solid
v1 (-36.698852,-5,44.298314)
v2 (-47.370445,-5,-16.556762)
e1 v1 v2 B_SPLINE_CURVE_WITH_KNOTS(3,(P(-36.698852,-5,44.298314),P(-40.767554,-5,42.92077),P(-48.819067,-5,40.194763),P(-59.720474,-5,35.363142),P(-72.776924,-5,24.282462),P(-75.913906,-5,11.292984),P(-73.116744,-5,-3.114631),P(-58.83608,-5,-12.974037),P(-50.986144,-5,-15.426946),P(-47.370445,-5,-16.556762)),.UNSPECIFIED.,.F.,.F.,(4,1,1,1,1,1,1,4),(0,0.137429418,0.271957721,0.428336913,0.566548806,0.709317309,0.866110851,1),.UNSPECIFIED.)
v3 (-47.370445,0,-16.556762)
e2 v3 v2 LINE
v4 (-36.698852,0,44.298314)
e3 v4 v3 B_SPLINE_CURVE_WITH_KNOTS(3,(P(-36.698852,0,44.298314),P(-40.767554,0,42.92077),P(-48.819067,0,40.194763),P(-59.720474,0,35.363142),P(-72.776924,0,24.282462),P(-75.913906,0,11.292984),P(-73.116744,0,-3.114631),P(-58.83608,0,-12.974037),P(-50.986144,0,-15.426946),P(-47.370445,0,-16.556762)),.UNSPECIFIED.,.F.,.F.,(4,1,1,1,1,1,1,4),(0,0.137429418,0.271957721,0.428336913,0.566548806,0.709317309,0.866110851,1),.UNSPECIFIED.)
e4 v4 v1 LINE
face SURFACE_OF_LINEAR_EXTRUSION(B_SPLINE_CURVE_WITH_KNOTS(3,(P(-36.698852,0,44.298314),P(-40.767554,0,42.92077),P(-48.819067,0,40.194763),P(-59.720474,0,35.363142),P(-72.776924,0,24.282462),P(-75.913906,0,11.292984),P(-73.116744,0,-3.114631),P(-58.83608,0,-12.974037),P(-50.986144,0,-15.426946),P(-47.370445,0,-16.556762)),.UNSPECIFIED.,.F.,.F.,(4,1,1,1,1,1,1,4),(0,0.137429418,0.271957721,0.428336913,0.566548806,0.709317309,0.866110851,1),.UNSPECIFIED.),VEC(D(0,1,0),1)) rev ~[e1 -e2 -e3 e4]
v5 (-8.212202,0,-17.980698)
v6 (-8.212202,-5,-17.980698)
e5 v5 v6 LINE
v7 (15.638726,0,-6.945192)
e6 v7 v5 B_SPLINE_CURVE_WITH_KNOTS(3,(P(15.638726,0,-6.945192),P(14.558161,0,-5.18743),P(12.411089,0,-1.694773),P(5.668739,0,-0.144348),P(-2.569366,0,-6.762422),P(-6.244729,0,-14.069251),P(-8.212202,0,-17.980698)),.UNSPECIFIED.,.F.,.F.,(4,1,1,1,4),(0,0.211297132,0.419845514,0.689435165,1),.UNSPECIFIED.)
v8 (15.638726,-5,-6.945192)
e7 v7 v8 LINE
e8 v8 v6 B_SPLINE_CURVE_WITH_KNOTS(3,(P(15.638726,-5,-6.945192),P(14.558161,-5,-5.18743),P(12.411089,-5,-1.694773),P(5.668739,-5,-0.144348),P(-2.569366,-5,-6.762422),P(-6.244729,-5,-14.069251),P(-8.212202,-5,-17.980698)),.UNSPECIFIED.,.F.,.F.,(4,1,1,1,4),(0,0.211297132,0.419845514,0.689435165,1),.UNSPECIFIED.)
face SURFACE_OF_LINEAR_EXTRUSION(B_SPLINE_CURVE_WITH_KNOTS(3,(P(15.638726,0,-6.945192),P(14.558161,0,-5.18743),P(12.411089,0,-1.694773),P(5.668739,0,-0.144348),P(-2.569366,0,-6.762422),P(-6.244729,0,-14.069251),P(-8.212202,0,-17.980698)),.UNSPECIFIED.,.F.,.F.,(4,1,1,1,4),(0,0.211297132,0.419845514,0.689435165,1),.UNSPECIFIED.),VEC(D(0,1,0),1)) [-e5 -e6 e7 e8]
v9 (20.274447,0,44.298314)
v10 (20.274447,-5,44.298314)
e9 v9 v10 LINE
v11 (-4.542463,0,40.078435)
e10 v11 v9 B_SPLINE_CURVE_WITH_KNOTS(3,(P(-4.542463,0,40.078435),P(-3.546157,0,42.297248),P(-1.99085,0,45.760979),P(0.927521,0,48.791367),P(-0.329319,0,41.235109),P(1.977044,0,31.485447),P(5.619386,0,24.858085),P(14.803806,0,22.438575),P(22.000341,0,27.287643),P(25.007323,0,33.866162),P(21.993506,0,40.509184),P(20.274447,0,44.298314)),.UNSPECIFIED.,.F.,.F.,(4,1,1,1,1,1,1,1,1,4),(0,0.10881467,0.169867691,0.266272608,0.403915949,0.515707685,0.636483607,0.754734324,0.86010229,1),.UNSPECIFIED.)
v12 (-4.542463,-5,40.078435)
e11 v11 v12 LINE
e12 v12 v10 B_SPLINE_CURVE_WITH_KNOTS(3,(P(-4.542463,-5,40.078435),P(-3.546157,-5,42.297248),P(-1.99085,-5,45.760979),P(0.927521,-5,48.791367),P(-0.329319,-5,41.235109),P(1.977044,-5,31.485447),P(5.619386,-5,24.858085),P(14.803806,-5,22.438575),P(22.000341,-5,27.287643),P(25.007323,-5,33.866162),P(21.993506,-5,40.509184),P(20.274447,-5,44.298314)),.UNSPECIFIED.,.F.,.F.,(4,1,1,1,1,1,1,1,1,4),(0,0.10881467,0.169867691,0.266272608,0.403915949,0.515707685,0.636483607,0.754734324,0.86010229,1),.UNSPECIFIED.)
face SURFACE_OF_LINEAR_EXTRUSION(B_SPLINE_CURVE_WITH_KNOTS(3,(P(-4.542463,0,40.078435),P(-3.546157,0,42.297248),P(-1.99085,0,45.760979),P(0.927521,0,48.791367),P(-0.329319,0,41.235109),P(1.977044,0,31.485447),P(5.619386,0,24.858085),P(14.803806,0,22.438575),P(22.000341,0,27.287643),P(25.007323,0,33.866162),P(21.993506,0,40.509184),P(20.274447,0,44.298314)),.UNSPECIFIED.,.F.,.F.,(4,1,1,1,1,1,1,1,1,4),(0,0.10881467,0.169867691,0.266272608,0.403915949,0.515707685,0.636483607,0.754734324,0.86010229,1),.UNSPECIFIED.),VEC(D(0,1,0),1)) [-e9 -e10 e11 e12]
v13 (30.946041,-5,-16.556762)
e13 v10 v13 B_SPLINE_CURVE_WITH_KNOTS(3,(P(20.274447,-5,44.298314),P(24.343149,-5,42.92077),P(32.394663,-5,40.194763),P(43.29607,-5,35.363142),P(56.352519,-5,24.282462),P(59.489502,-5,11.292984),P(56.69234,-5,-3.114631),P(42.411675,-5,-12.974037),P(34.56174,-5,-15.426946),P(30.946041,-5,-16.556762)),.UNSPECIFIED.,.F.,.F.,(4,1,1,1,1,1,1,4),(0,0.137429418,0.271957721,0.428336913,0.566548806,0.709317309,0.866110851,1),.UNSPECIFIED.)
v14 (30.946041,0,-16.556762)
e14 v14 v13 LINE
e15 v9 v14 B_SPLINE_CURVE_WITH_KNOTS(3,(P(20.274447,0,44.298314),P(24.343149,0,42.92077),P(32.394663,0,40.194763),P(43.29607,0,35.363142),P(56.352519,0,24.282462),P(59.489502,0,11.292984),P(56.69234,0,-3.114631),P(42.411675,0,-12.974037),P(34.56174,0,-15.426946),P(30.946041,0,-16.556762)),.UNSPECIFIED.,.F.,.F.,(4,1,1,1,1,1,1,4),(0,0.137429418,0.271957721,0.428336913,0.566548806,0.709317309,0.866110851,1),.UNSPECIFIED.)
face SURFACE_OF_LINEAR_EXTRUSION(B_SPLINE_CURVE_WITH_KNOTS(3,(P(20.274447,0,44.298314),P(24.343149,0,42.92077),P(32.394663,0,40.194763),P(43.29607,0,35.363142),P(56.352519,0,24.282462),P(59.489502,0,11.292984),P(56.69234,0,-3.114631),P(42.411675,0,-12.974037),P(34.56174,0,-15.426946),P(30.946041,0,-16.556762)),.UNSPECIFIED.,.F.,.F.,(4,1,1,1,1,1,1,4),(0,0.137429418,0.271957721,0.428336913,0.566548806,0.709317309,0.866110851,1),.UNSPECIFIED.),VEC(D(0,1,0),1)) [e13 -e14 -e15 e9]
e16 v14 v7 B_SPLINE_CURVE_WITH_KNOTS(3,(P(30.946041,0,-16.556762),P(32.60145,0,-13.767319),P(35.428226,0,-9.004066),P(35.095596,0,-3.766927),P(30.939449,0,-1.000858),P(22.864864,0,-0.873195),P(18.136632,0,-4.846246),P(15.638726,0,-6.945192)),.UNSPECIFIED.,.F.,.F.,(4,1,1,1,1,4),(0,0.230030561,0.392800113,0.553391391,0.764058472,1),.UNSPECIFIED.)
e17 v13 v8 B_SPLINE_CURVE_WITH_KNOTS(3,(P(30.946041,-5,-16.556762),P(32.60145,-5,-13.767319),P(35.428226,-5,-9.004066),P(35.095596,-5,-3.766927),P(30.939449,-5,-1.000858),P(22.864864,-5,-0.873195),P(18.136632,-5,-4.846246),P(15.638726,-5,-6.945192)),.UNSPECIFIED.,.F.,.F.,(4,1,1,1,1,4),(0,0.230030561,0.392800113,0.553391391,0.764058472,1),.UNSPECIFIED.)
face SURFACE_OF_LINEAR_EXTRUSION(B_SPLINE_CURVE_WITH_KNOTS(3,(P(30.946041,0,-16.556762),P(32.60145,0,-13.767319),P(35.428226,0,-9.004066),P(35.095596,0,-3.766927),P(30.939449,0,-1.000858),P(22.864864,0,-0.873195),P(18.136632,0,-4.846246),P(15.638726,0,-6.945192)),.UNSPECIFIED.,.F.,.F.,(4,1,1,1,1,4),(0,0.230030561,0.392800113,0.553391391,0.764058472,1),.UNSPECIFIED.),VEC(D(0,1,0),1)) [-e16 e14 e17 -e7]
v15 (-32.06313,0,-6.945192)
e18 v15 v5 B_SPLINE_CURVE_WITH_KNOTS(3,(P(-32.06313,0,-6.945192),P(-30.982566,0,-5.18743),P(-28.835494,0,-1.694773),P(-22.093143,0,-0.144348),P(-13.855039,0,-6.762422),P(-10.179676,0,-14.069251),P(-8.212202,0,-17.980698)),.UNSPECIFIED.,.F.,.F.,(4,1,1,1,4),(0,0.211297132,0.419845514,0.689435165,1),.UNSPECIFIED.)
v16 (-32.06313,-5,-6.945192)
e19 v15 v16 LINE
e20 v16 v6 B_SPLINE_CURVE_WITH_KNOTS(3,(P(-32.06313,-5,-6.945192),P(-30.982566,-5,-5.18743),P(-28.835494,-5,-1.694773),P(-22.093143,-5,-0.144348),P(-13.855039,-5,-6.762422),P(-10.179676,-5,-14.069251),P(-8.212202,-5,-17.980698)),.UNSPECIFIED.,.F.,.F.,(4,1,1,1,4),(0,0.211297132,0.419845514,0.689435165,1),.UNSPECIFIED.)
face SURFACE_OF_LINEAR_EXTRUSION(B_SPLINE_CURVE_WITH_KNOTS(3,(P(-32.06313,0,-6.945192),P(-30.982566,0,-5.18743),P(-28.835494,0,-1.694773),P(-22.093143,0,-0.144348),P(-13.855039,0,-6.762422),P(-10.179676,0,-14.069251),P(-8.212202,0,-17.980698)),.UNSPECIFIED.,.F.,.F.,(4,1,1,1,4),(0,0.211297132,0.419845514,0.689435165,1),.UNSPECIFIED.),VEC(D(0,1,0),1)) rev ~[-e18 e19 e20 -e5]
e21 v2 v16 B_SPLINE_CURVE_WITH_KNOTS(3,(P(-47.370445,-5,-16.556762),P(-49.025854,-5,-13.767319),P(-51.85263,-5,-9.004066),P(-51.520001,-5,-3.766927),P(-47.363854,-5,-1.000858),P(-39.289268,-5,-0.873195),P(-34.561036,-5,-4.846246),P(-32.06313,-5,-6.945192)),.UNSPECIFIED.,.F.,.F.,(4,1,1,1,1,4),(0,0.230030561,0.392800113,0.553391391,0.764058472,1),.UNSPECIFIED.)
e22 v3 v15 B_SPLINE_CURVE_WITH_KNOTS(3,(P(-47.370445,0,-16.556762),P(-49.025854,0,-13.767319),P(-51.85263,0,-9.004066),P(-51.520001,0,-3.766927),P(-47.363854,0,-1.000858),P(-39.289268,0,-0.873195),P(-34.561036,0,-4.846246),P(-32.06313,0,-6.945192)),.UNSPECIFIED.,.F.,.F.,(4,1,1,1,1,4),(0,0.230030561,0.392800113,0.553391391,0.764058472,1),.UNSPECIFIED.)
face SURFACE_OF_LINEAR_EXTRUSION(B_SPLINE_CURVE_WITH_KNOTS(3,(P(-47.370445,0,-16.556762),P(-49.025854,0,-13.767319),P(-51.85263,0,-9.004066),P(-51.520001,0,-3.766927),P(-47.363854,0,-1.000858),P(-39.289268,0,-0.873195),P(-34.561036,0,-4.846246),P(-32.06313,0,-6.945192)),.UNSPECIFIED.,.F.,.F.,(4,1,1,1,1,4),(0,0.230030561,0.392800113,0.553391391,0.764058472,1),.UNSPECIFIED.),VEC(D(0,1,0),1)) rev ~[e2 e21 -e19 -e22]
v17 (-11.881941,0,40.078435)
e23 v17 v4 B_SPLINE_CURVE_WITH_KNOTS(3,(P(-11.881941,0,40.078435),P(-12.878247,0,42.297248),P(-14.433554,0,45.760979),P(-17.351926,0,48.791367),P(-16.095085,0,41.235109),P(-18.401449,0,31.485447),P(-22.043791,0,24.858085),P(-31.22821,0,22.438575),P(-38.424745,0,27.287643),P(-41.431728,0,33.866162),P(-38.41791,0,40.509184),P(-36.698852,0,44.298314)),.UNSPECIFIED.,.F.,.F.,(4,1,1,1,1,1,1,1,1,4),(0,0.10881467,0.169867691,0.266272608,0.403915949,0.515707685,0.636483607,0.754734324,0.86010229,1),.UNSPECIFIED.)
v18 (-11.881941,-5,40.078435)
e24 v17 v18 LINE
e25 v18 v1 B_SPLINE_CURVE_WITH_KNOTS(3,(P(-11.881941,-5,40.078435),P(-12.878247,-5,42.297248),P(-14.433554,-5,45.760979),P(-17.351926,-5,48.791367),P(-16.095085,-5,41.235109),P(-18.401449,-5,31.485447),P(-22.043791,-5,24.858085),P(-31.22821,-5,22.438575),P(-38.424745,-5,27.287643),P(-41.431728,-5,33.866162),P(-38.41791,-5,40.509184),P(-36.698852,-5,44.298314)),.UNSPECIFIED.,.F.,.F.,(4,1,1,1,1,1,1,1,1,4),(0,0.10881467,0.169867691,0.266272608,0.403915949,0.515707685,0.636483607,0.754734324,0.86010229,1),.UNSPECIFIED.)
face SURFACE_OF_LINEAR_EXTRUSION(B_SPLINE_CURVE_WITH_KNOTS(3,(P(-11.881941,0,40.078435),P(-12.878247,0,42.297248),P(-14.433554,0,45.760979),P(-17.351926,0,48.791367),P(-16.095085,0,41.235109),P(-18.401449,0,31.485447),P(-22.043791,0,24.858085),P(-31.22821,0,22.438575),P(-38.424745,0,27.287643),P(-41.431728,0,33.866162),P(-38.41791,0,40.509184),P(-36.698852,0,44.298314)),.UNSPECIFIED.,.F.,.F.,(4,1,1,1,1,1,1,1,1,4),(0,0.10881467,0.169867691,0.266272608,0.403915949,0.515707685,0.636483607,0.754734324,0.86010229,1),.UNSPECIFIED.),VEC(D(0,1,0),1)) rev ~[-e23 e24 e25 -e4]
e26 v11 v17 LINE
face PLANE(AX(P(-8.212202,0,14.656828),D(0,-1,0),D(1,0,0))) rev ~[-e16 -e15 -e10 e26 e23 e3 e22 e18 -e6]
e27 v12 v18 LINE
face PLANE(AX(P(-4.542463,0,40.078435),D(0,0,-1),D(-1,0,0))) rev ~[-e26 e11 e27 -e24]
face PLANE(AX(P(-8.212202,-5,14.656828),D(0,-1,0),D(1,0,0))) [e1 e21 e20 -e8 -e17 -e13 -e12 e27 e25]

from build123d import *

# Parameters (mm, degrees)
F1_DEPTH = 5


with BuildPart() as f1:
    # F0 (on Front) → F1 (new body)
    with BuildSketch(Plane.XZ):
        with BuildLine():
            Line((-8.2122022286, 40.0784350932), (-11.8819409981, 40.0784350932))
            add(Edge.make_bspline(
                [(-11.8819409981, 40.0784350932), (-12.8782472371, 42.2972484802), (-14.4335544357, 45.7609791067), (-17.3519257227, 48.7913666131), (-16.0950854738, 41.2351091341), (-18.4014485043, 31.4854467346), (-22.0437905993, 24.85808478), (-31.2282103596, 22.4385748293), (-38.4247454255, 27.2876434832), (-41.4317275403, 33.8661623662), (-38.41791048, 40.5091837611), (-36.6988517344, 44.2983135581)],
                knots=[0, 0, 0, 0, 0.1088146702, 0.1698676905, 0.2662726076, 0.4039159487, 0.5157076846, 0.6364836069, 0.7547343235, 0.8601022896, 1, 1, 1, 1], degree=3))
            add(Edge.make_bspline(
                [(-36.6988517344, 44.2983135581), (-40.7675535004, 42.9207700785), (-48.8190673042, 40.1947628707), (-59.720474171, 35.363141512), (-72.7769239422, 24.2824619419), (-75.9139064544, 11.2929836241), (-73.1167440149, -3.1146307179), (-58.8360799137, -12.9740366543), (-50.9861442753, -15.4269461348), (-47.3704449832, -16.5567621589)],
                knots=[0, 0, 0, 0, 0.1374294184, 0.271957721, 0.4283369128, 0.5665488064, 0.709317309, 0.8661108513, 1, 1, 1, 1], degree=3))
            add(Edge.make_bspline(
                [(-47.3704449832, -16.5567621589), (-49.0258540698, -13.767318885), (-51.8526301052, -9.0040664284), (-51.5200005236, -3.7669274307), (-47.3638537079, -1.00085823), (-39.2892684136, -0.8731954731), (-34.5610362718, -4.8462458488), (-32.0631302893, -6.9451923482)],
                knots=[0, 0, 0, 0, 0.2300305605, 0.3928001127, 0.553391391, 0.764058472, 1, 1, 1, 1], degree=3))
            add(Edge.make_bspline(
                [(-32.0631302893, -6.9451923482), (-30.9825657831, -5.1874304781), (-28.8354937584, -1.6947733382), (-22.0931432409, -0.1443481526), (-13.8550388164, -6.7624223585), (-10.1796756768, -14.0692507531), (-8.2122022286, -17.9806984961)],
                knots=[0, 0, 0, 0, 0.2112971318, 0.419845514, 0.689435165, 1, 1, 1, 1], degree=3))
            add(Edge.make_bspline(
                [(15.6387258321, -6.9451923482), (14.5581613259, -5.1874304781), (12.4110893012, -1.6947733382), (5.6687387837, -0.1443481526), (-2.5693656408, -6.7624223585), (-6.2447287804, -14.0692507531), (-8.2122022286, -17.9806984961)],
                knots=[0, 0, 0, 0, 0.2112971318, 0.419845514, 0.689435165, 1, 1, 1, 1], degree=3))
            add(Edge.make_bspline(
                [(30.946040526, -16.5567621589), (32.6014496126, -13.767318885), (35.428225648, -9.0040664284), (35.0955960664, -3.7669274307), (30.9394492507, -1.00085823), (22.8648639564, -0.8731954731), (18.1366318146, -4.8462458488), (15.6387258321, -6.9451923482)],
                knots=[0, 0, 0, 0, 0.2300305605, 0.3928001127, 0.553391391, 0.764058472, 1, 1, 1, 1], degree=3))
            add(Edge.make_bspline(
                [(20.2744472772, 44.2983135581), (24.3431490432, 42.9207700785), (32.394662847, 40.1947628707), (43.2960697138, 35.363141512), (56.352519485, 24.2824619419), (59.4895019971, 11.2929836241), (56.6923395577, -3.1146307179), (42.4116754565, -12.9740366543), (34.5617398181, -15.4269461348), (30.946040526, -16.5567621589)],
                knots=[0, 0, 0, 0, 0.1374294184, 0.271957721, 0.4283369128, 0.5665488064, 0.709317309, 0.8661108513, 1, 1, 1, 1], degree=3))
            add(Edge.make_bspline(
                [(-4.5424634591, 40.0784350932), (-3.5461572201, 42.2972484802), (-1.9908500215, 45.7609791067), (0.9275212655, 48.7913666131), (-0.3293189834, 41.2351091341), (1.9770440471, 31.4854467346), (5.6193861421, 24.85808478), (14.8038059024, 22.4385748293), (22.0003409683, 27.2876434832), (25.0073230831, 33.8661623662), (21.9935060227, 40.5091837611), (20.2744472772, 44.2983135581)],
                knots=[0, 0, 0, 0, 0.1088146702, 0.1698676905, 0.2662726076, 0.4039159487, 0.5157076846, 0.6364836069, 0.7547343235, 0.8601022896, 1, 1, 1, 1], degree=3))
            Line((-4.5424634591, 40.0784350932), (-8.2122022286, 40.0784350932))
        make_face()
        with BuildLine():
            add(Edge.make_bspline(
                [(-40.7788082957, 40.8485867083), (-45.0160925485, 39.1557450069), (-53.0935510599, 35.9287114181), (-62.2941692207, 30.6878977022), (-71.2479782326, 20.5851416615), (-73.0395933906, 13.1368363398), (-70.655821628, 0.3918412405), (-65.9333309108, -4.7486149953), (-56.4205247664, -11.0687593178), (-52.9760592159, -12.4550883248), (-51.5802241862, -13.0168842152)],
                knots=[0, 0, 0, 0, 0.1450786062, 0.2765607292, 0.4190573419, 0.5300860887, 0.6687412322, 0.7763945775, 0.9093861509, 1, 1, 1, 1], degree=3))
            add(Edge.make_bspline(
                [(-12.7671184018, 37.1527262032), (-12.8105221655, 37.767832184), (-12.9167695581, 39.2735404689), (-14.2569275875, 43.199559326), (-15.3833842453, 44.8124103405), (-15.4205368039, 43.5883704744), (-15.2325001114, 42.0644743626), (-15.5858480298, 37.7221519204), (-16.6233242245, 33.2855966544), (-18.8663482525, 24.8126850649), (-23.665219481, 22.8462807986), (-32.7768476073, 20.7730831752), (-39.0865075301, 23.8717377388), (-43.0417250552, 31.6481993654), (-41.5266216034, 37.7005347177), (-40.999533454, 39.9194052312), (-40.7788082957, 40.8485867083)],
                knots=[0, 0, 0, 0, 0.0505373663, 0.1237096266, 0.1629392742, 0.1913954138, 0.2358051509, 0.3063180282, 0.384250961, 0.4831926503, 0.5605011807, 0.6644710974, 0.7540445736, 0.853320775, 0.9385761278, 1, 1, 1, 1], degree=3))
            add(Edge.make_bspline(
                [(-3.9949859492, 37.1527262032), (-6.9190301001, 37.1527262032), (-9.843074251, 37.1527262032), (-12.7671184018, 37.1527262032)],
                knots=[0, 0, 0, 0, 8.7721324526, 8.7721324526, 8.7721324526, 8.7721324526], degree=3))
            add(Edge.make_bspline(
                [(23.7335767597, 41.2493087351), (24.4530114667, 39.9054678233), (26.0244092307, 36.9702346694), (26.4309050247, 30.0518223198), (21.4354728883, 23.0866334692), (16.0479597422, 20.9866016223), (7.9404867152, 21.5334795427), (2.0840254692, 24.9926080902), (-1.1094411846, 32.1097669255), (-2.0201724202, 39.2006909165), (-0.2992768192, 43.7223415812), (-0.8622936336, 45.0976152318), (-1.5127566292, 43.0204295249), (-2.6220619028, 39.8039584717), (-3.553918632, 38.0044644382), (-3.9949859492, 37.1527262032)],
                knots=[0, 0, 0, 0, 0.0759707125, 0.1659361253, 0.2650579009, 0.3479302006, 0.4454920972, 0.5347423734, 0.6305967349, 0.7255041462, 0.8006387765, 0.8294813208, 0.8722005151, 0.9395098257, 1, 1, 1, 1], degree=3))
            add(Edge.make_bspline(
                [(33.6919203401, -14.0843614936), (36.1215948245, -13.1765941813), (40.9033469103, -11.3900510592), (46.9128093998, -7.3858234932), (52.3922477573, -1.9336381195), (55.6792503222, 4.8090224621), (57.3430496625, 14.3121441122), (51.6156153831, 23.3802559022), (46.1096093701, 29.991862224), (34.2840988264, 35.6082745296), (26.8791146652, 39.6051952856), (24.6061054028, 40.7932544385), (23.7335767597, 41.2493087351)],
                knots=[0, 0, 0, 0, 0.0974700928, 0.1918272684, 0.2883916571, 0.3843656764, 0.4907723409, 0.6027746209, 0.7066328683, 0.8340968769, 0.9363156018, 1, 1, 1, 1], degree=3))
            add(Edge.make_bspline(
                [(15.9203130752, -4.4681387953), (17.0357728529, -3.6507396117), (19.5409740796, -1.8149500311), (25.6074769381, 1.673208692), (34.2650515573, 0.1921565778), (38.1250522154, -4.8981844373), (36.9121199249, -10.7908754792), (34.7328056008, -13.0197874016), (33.6919203401, -14.0843614936)],
                knots=[0, 0, 0, 0, 0.1453813722, 0.326510735, 0.5253570285, 0.690702799, 0.8522733072, 1, 1, 1, 1], degree=3))
            add(Edge.make_bspline(
                [(-8.41199141, -15.5372489244), (-7.9095024587, -14.4044748883), (-6.7842766221, -11.8678487411), (-3.7155099659, -6.8588281055), (2.1506322805, -0.0343969426), (8.8089995272, 1.9097644372), (13.6745986257, -0.6725949147), (15.1891981707, -3.2324613465), (15.9203130752, -4.4681387953)],
                knots=[0, 0, 0, 0, 0.1379016266, 0.3088037514, 0.5193421259, 0.6974684541, 0.8539644865, 1, 1, 1, 1], degree=3))
            add(Edge.make_bspline(
                [(-32.7044092119, -4.2089852504), (-31.9543092274, -3.1033377243), (-30.4169220227, -0.8372286791), (-26.6621159645, 2.0828916938), (-19.6879348045, 1.1486292117), (-15.0907003626, -2.8975346703), (-9.8445203676, -10.136611032), (-8.8510687142, -13.8819263464), (-8.41199141, -15.5372489244)],
                knots=[0, 0, 0, 0, 0.1390073425, 0.2849061646, 0.4596494045, 0.6323584219, 0.8375129051, 1, 1, 1, 1], degree=3))
            add(Edge.make_bspline(
                [(-51.5802241862, -13.0168842152), (-51.9566141102, -12.1811170797), (-52.8301859904, -10.241366249), (-54.4122635369, -4.5818082654), (-49.7189754854, -0.077195565), (-43.6358806444, 1.8644629269), (-36.5506154261, -0.1909494177), (-33.9335443794, -2.9249383556), (-32.7044092119, -4.2089852504)],
                knots=[0, 0, 0, 0, 0.1250182086, 0.2901575853, 0.4628741696, 0.6427974632, 0.832236041, 1, 1, 1, 1], degree=3))
        make_face(mode=Mode.SUBTRACT)
        with BuildLine():
            add(Edge.make_bspline(
                [(-12.7671184018, 37.1527262032), (-12.8105221655, 37.767832184), (-12.9167695581, 39.2735404689), (-14.2569275875, 43.199559326), (-15.3833842453, 44.8124103405), (-15.4205368039, 43.5883704744), (-15.2325001114, 42.0644743626), (-15.5858480298, 37.7221519204), (-16.6233242245, 33.2855966544), (-18.8663482525, 24.8126850649), (-23.665219481, 22.8462807986), (-32.7768476073, 20.7730831752), (-39.0865075301, 23.8717377388), (-43.0417250552, 31.6481993654), (-41.5266216034, 37.7005347177), (-40.999533454, 39.9194052312), (-40.7788082957, 40.8485867083)],
                knots=[0, 0, 0, 0, 0.0505373663, 0.1237096266, 0.1629392742, 0.1913954138, 0.2358051509, 0.3063180282, 0.384250961, 0.4831926503, 0.5605011807, 0.6644710974, 0.7540445736, 0.853320775, 0.9385761278, 1, 1, 1, 1], degree=3))
            add(Edge.make_bspline(
                [(-40.7788082957, 40.8485867083), (-45.0160925485, 39.1557450069), (-53.0935510599, 35.9287114181), (-62.2941692207, 30.6878977022), (-71.2479782326, 20.5851416615), (-73.0395933906, 13.1368363398), (-70.655821628, 0.3918412405), (-65.9333309108, -4.7486149953), (-56.4205247664, -11.0687593178), (-52.9760592159, -12.4550883248), (-51.5802241862, -13.0168842152)],
                knots=[0, 0, 0, 0, 0.1450786062, 0.2765607292, 0.4190573419, 0.5300860887, 0.6687412322, 0.7763945775, 0.9093861509, 1, 1, 1, 1], degree=3))
            add(Edge.make_bspline(
                [(-51.5802241862, -13.0168842152), (-51.9566141102, -12.1811170797), (-52.8301859904, -10.241366249), (-54.4122635369, -4.5818082654), (-49.7189754854, -0.077195565), (-43.6358806444, 1.8644629269), (-36.5506154261, -0.1909494177), (-33.9335443794, -2.9249383556), (-32.7044092119, -4.2089852504)],
                knots=[0, 0, 0, 0, 0.1250182086, 0.2901575853, 0.4628741696, 0.6427974632, 0.832236041, 1, 1, 1, 1], degree=3))
            add(Edge.make_bspline(
                [(-32.7044092119, -4.2089852504), (-31.9543092274, -3.1033377243), (-30.4169220227, -0.8372286791), (-26.6621159645, 2.0828916938), (-19.6879348045, 1.1486292117), (-15.0907003626, -2.8975346703), (-9.8445203676, -10.136611032), (-8.8510687142, -13.8819263464), (-8.41199141, -15.5372489244)],
                knots=[0, 0, 0, 0, 0.1390073425, 0.2849061646, 0.4596494045, 0.6323584219, 0.8375129051, 1, 1, 1, 1], degree=3))
            add(Edge.make_bspline(
                [(-8.41199141, -15.5372489244), (-7.9095024587, -14.4044748883), (-6.7842766221, -11.8678487411), (-3.7155099659, -6.8588281055), (2.1506322805, -0.0343969426), (8.8089995272, 1.9097644372), (13.6745986257, -0.6725949147), (15.1891981707, -3.2324613465), (15.9203130752, -4.4681387953)],
                knots=[0, 0, 0, 0, 0.1379016266, 0.3088037514, 0.5193421259, 0.6974684541, 0.8539644865, 1, 1, 1, 1], degree=3))
            add(Edge.make_bspline(
                [(15.9203130752, -4.4681387953), (17.0357728529, -3.6507396117), (19.5409740796, -1.8149500311), (25.6074769381, 1.673208692), (34.2650515573, 0.1921565778), (38.1250522154, -4.8981844373), (36.9121199249, -10.7908754792), (34.7328056008, -13.0197874016), (33.6919203401, -14.0843614936)],
                knots=[0, 0, 0, 0, 0.1453813722, 0.326510735, 0.5253570285, 0.690702799, 0.8522733072, 1, 1, 1, 1], degree=3))
            add(Edge.make_bspline(
                [(33.6919203401, -14.0843614936), (36.1215948245, -13.1765941813), (40.9033469103, -11.3900510592), (46.9128093998, -7.3858234932), (52.3922477573, -1.9336381195), (55.6792503222, 4.8090224621), (57.3430496625, 14.3121441122), (51.6156153831, 23.3802559022), (46.1096093701, 29.991862224), (34.2840988264, 35.6082745296), (26.8791146652, 39.6051952856), (24.6061054028, 40.7932544385), (23.7335767597, 41.2493087351)],
                knots=[0, 0, 0, 0, 0.0974700928, 0.1918272684, 0.2883916571, 0.3843656764, 0.4907723409, 0.6027746209, 0.7066328683, 0.8340968769, 0.9363156018, 1, 1, 1, 1], degree=3))
            add(Edge.make_bspline(
                [(23.7335767597, 41.2493087351), (24.4530114667, 39.9054678233), (26.0244092307, 36.9702346694), (26.4309050247, 30.0518223198), (21.4354728883, 23.0866334692), (16.0479597422, 20.9866016223), (7.9404867152, 21.5334795427), (2.0840254692, 24.9926080902), (-1.1094411846, 32.1097669255), (-2.0201724202, 39.2006909165), (-0.2992768192, 43.7223415812), (-0.8622936336, 45.0976152318), (-1.5127566292, 43.0204295249), (-2.6220619028, 39.8039584717), (-3.553918632, 38.0044644382), (-3.9949859492, 37.1527262032)],
                knots=[0, 0, 0, 0, 0.0759707125, 0.1659361253, 0.2650579009, 0.3479302006, 0.4454920972, 0.5347423734, 0.6305967349, 0.7255041462, 0.8006387765, 0.8294813208, 0.8722005151, 0.9395098257, 1, 1, 1, 1], degree=3))
            add(Edge.make_bspline(
                [(-3.9949859492, 37.1527262032), (-6.9190301001, 37.1527262032), (-9.843074251, 37.1527262032), (-12.7671184018, 37.1527262032)],
                knots=[0, 0, 0, 0, 8.7721324526, 8.7721324526, 8.7721324526, 8.7721324526], degree=3))
        make_face()
    extrude(amount=F1_DEPTH)


solid = f1.part
